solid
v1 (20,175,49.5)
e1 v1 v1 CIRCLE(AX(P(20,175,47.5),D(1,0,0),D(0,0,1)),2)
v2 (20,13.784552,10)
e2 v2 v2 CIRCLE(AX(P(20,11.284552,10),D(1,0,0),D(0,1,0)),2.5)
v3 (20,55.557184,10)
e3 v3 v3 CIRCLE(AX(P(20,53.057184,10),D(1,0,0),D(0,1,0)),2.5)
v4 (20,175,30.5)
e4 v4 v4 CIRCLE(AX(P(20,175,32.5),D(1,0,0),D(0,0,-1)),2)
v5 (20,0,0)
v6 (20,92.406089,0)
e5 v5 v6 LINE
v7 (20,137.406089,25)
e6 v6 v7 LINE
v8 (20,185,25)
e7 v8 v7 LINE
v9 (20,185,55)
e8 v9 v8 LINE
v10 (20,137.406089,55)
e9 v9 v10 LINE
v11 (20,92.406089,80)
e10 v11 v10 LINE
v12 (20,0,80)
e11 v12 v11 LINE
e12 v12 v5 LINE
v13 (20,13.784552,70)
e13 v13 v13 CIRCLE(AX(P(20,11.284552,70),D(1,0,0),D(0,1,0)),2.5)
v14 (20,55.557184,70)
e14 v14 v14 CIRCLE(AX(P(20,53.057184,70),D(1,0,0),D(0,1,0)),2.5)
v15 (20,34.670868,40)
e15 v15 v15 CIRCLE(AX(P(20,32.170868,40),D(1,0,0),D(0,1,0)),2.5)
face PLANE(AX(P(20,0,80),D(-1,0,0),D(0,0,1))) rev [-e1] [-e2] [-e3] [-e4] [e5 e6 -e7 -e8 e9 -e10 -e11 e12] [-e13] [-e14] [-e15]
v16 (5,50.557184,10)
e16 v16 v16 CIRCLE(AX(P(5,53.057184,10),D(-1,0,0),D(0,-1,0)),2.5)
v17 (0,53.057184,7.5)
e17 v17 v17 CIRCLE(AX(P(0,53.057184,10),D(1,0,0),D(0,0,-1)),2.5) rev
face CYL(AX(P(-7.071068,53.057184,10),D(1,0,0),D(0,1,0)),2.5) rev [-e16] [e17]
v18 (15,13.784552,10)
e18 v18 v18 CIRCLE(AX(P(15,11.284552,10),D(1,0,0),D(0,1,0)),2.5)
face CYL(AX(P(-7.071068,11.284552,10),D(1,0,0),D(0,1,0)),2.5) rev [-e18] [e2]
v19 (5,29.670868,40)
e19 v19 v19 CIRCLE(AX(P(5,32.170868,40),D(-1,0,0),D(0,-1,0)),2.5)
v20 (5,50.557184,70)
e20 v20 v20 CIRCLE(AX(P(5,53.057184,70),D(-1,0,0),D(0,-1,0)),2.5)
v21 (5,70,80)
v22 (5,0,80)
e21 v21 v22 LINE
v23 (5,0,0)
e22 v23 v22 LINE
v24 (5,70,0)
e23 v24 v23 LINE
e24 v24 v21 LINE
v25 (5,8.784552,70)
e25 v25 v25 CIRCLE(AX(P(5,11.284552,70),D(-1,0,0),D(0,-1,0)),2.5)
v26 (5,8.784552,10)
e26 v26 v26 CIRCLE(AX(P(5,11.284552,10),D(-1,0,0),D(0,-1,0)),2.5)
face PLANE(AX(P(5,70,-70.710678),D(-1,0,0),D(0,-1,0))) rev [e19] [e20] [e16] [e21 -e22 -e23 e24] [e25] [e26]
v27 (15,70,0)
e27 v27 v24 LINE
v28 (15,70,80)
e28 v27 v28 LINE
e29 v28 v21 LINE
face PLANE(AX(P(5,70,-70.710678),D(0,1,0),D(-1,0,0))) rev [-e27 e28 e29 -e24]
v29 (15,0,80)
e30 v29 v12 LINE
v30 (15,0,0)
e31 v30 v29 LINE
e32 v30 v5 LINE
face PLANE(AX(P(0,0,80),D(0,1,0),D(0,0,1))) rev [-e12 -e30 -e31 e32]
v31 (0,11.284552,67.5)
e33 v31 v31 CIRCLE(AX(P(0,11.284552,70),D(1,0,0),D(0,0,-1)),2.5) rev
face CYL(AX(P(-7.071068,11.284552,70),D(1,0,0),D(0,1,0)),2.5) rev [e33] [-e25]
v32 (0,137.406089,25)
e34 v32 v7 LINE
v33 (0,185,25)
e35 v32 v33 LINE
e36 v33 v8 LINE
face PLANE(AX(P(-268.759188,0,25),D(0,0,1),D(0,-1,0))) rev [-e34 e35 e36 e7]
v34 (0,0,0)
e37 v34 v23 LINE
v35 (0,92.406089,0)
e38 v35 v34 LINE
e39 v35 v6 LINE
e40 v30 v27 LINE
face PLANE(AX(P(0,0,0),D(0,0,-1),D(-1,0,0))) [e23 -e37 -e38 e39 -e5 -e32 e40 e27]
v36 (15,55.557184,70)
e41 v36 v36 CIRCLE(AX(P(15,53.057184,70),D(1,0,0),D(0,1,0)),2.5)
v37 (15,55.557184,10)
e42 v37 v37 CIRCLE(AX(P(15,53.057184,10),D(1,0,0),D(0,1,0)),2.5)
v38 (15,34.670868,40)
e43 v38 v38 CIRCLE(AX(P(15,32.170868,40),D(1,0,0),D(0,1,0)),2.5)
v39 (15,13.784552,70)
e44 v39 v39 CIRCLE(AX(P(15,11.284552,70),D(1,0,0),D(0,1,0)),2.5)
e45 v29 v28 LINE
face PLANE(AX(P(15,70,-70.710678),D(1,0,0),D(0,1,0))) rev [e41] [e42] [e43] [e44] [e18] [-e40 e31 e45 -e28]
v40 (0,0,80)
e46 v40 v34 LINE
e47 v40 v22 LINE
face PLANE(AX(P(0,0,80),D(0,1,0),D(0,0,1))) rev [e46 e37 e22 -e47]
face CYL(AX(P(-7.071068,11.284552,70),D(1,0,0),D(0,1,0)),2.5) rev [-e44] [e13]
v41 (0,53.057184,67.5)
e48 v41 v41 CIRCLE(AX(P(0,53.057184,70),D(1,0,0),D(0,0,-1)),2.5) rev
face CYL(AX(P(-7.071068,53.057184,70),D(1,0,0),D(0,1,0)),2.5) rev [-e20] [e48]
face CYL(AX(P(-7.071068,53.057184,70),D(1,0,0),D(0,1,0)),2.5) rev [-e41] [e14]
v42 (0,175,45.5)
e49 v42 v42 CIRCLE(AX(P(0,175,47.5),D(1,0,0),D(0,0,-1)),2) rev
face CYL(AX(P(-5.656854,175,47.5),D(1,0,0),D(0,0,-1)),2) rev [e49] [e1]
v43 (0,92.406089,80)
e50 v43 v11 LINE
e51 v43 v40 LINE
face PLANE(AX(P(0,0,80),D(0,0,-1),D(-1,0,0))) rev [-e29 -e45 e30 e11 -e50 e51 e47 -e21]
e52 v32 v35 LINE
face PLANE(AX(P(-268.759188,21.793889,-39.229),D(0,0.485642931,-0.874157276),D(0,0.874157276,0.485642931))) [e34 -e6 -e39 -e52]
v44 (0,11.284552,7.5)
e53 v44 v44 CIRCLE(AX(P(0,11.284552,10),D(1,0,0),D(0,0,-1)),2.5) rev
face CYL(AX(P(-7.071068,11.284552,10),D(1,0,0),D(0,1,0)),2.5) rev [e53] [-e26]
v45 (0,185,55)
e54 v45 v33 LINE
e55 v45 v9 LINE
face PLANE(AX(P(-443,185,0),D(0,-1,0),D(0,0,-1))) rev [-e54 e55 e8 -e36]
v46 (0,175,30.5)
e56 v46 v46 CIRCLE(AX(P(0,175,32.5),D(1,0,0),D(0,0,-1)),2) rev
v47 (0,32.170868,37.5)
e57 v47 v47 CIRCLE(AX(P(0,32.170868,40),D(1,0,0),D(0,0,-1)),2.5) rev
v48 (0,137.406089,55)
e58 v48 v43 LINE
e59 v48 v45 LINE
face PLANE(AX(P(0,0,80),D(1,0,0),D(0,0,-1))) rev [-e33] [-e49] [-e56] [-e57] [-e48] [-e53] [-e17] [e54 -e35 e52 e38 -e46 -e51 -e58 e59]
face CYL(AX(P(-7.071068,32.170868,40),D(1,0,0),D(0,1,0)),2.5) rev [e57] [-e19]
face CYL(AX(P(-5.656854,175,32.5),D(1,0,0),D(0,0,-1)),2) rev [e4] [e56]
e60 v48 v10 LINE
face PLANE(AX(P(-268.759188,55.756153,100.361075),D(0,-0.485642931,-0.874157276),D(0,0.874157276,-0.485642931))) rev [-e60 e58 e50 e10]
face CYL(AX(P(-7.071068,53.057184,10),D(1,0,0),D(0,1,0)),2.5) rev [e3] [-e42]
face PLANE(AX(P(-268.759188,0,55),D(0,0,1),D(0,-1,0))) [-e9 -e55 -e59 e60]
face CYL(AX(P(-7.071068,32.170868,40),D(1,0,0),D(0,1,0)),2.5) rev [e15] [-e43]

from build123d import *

# Parameters (mm, degrees)
SUPPORT_BALISE_W                           = 20
SUPPORT_BALISE_H                           = 350
SUPPORT_BALISE_BOSSAGE_DEPTH               = 80
ESQUISSE3_W                                = 80
ESQUISSE3_H                                = 80
SUPPORT_CHEVAL_ENLEVEMENT_DE_MATIERE_DEPTH = 10
ESQUISSE8_W                                = 10
ESQUISSE8_H                                = 70
SUPPORT_CHEVAL_DEPTH                       = 80
VIS_REACH                                  = 376.466
SERRAGE_VIS_R                              = 2.5
VIS_DIRECTION_2_DEPTH                      = 375.466286867
ENL_V_MAT_EXTRU_5_DEPTH                    = 20
POUR_IMPRESSION_R                          = 15
FIXATION_POUR_ASSEMBLAGE_R                 = 2
VIS_POUR_ASSEMBLAGE_DEPTH                  = 20
ESQUISSE13_R                               = 2
ENL_V_MAT_EXTRU_10_DEPTH                   = 463


with BuildPart() as part:
    # Support Balise → Support balise bossage (new body)
    with BuildSketch(Plane.XY):
        with Locations((10, 175)):
            Rectangle(SUPPORT_BALISE_W, SUPPORT_BALISE_H)
    extrude(amount=SUPPORT_BALISE_BOSSAGE_DEPTH)

    # Esquisse3 → Support Cheval enlevement de matiere (add)
    with BuildSketch(Plane(origin=(0, 350, 0), x_dir=(1, 0, 0), z_dir=(0, 1, 0))):
        with Locations((-20, -40)):
            Rectangle(ESQUISSE3_W, ESQUISSE3_H)
    extrude(amount=SUPPORT_CHEVAL_ENLEVEMENT_DE_MATIERE_DEPTH)

    # Esquisse8 → Support Cheval (cut)
    with BuildSketch(Plane.XY.offset(80)):
        with Locations((10, 35)):
            Rectangle(ESQUISSE8_W, ESQUISSE8_H)
    extrude(amount=-SUPPORT_CHEVAL_DEPTH, mode=Mode.SUBTRACT)

    # Vis: up to this face of the body (flat: up to its plane)
    vis_end = Plane(part.part.faces().sort_by_distance((0, 175, 40))[0])
    # Serrage vis → Vis (cut, up to the picked face)
    with BuildSketch(Plane(origin=(5, 0, 0), x_dir=(0, 0, -1), z_dir=(1, 0, 0)), mode=Mode.PRIVATE) as vis_sk1:
        with Locations((-70, 11.284552026)):
            Circle(SERRAGE_VIS_R)
    vis_tool1 = split(extrude(vis_sk1.sketch, amount=-VIS_REACH, mode=Mode.PRIVATE), bisect_by=vis_end, keep=Keep.BOTH, mode=Mode.PRIVATE)
    # Serrage vis → Vis (cut, up to the picked face)
    with BuildSketch(Plane(origin=(5, 0, 0), x_dir=(0, 0, -1), z_dir=(1, 0, 0)), mode=Mode.PRIVATE) as vis_sk2:
        with Locations((-70, 53.057184379)):
            Circle(SERRAGE_VIS_R)
    vis_tool2 = split(extrude(vis_sk2.sketch, amount=-VIS_REACH, mode=Mode.PRIVATE), bisect_by=vis_end, keep=Keep.BOTH, mode=Mode.PRIVATE)
    # Serrage vis → Vis (cut, up to the picked face)
    with BuildSketch(Plane(origin=(5, 0, 0), x_dir=(0, 0, -1), z_dir=(1, 0, 0)), mode=Mode.PRIVATE) as vis_sk3:
        with Locations((-10, 53.057184379)):
            Circle(SERRAGE_VIS_R)
    vis_tool3 = split(extrude(vis_sk3.sketch, amount=-VIS_REACH, mode=Mode.PRIVATE), bisect_by=vis_end, keep=Keep.BOTH, mode=Mode.PRIVATE)
    # Serrage vis → Vis (cut, up to the picked face)
    with BuildSketch(Plane(origin=(5, 0, 0), x_dir=(0, 0, -1), z_dir=(1, 0, 0)), mode=Mode.PRIVATE) as vis_sk4:
        with Locations((-10, 11.284552026)):
            Circle(SERRAGE_VIS_R)
    vis_tool4 = split(extrude(vis_sk4.sketch, amount=-VIS_REACH, mode=Mode.PRIVATE), bisect_by=vis_end, keep=Keep.BOTH, mode=Mode.PRIVATE)
    # Serrage vis → Vis (cut, up to the picked face)
    with BuildSketch(Plane(origin=(5, 0, 0), x_dir=(0, 0, -1), z_dir=(1, 0, 0)), mode=Mode.PRIVATE) as vis_sk5:
        with Locations((-40, 32.170868202)):
            Circle(SERRAGE_VIS_R)
    vis_tool5 = split(extrude(vis_sk5.sketch, amount=-VIS_REACH, mode=Mode.PRIVATE), bisect_by=vis_end, keep=Keep.BOTH, mode=Mode.PRIVATE)
    add(vis_tool1.solids().sort_by(Axis((5, 11.284552, 70), (-1, 0, 0)))[0], mode=Mode.SUBTRACT)
    add(vis_tool2.solids().sort_by(Axis((5, 53.057184, 70), (-1, 0, 0)))[0], mode=Mode.SUBTRACT)
    add(vis_tool3.solids().sort_by(Axis((5, 53.057184, 10), (-1, 0, 0)))[0], mode=Mode.SUBTRACT)
    add(vis_tool4.solids().sort_by(Axis((5, 11.284552, 10), (-1, 0, 0)))[0], mode=Mode.SUBTRACT)
    add(vis_tool5.solids().sort_by(Axis((5, 32.170868, 40), (-1, 0, 0)))[0], mode=Mode.SUBTRACT)

    # Serrage vis → Vis direction 2 (cut)
    with BuildSketch(Plane(origin=(5, 0, 0), x_dir=(0, 0, -1), z_dir=(1, 0, 0))):
        with Locations((-70, 11.284552026)):
            Circle(SERRAGE_VIS_R)
        with Locations((-70, 53.057184379)):
            Circle(SERRAGE_VIS_R)
        with Locations((-10, 53.057184379)):
            Circle(SERRAGE_VIS_R)
        with Locations((-10, 11.284552026)):
            Circle(SERRAGE_VIS_R)
        with Locations((-40, 32.170868202)):
            Circle(SERRAGE_VIS_R)
    extrude(amount=VIS_DIRECTION_2_DEPTH, mode=Mode.SUBTRACT)

    # Design → Enlèv. mat.-Extru.5 (cut)
    with BuildSketch(Plane(origin=(20, 0, 0), x_dir=(0, 0, -1), z_dir=(1, 0, 0))):
        Polygon((-55, 315), (-80, 360), (-80, 92.406088827), (-55, 137.406088827), align=None)
        Polygon((0, 92.406088827), (0, 360), (-25, 315), (-25, 137.406088827), align=None)
    extrude(amount=-ENL_V_MAT_EXTRU_5_DEPTH, mode=Mode.SUBTRACT)

    # Pour Impression
    # the kernel refuses this fillet: 15 mm, written as the material it adds along each edge
    with BuildSketch(Plane(origin=(0, 392.780897855, -18.211609919), x_dir=(1, 0, 0), z_dir=(0, -0.8741572761215375, 0.48564293117863266))) as pour_impression_piece_1_section:
        with BuildLine():
            CenterArc((POUR_IMPRESSION_R, -POUR_IMPRESSION_R), POUR_IMPRESSION_R, 90, 90)
            Line((0, -POUR_IMPRESSION_R), (0, 0))
            Line((0, 0), (POUR_IMPRESSION_R, 0))
        make_face()
    pour_impression_piece_1 = extrude(amount=86.439589046, mode=Mode.PRIVATE)
    pour_impression_piece_1 = split(pour_impression_piece_1, bisect_by=Plane(origin=(4.741525676, 350, 2.029382941), z_dir=(0, 1, 0)), keep=Keep.TOP, mode=Mode.PRIVATE)
    pour_impression_piece_1 = split(pour_impression_piece_1, bisect_by=Plane(origin=(4.741525676, 353.652889294, 0), z_dir=(0, 0, 1)), keep=Keep.TOP, mode=Mode.PRIVATE)
    add(pour_impression_piece_1)
    with BuildSketch(Plane(origin=(0, 317.219102145, 56.232834525), x_dir=(1, 0, 0), z_dir=(0, 0.8741572761215377, 0.4856429311786322))) as pour_impression_piece_2_section:
        with BuildLine():
            CenterArc((POUR_IMPRESSION_R, -POUR_IMPRESSION_R), POUR_IMPRESSION_R, 90, 90)
            Line((0, -POUR_IMPRESSION_R), (0, 0))
            Line((0, 0), (POUR_IMPRESSION_R, 0))
        make_face()
    pour_impression_piece_2 = extrude(amount=86.439589046, mode=Mode.PRIVATE)
    pour_impression_piece_2 = split(pour_impression_piece_2, bisect_by=Plane(origin=(4.741525676, 350, 77.970617059), z_dir=(0, 1, 0)), keep=Keep.TOP, mode=Mode.PRIVATE)
    pour_impression_piece_2 = split(pour_impression_piece_2, bisect_by=Plane(origin=(4.741525676, 353.652889294, 80), z_dir=(0, 0, -1)), keep=Keep.TOP, mode=Mode.PRIVATE)
    add(pour_impression_piece_2)

    # Fixation pour assemblage → Vis pour Assemblage (cut)
    with BuildSketch(Plane(origin=(20, 0, 0), x_dir=(0, 0, -1), z_dir=(1, 0, 0))):
        with Locations((-47.5, 195)):
            Circle(FIXATION_POUR_ASSEMBLAGE_R)
        with Locations((-32.5, 195)):
            Circle(FIXATION_POUR_ASSEMBLAGE_R)
        with Locations((-32.5, 175)):
            Circle(FIXATION_POUR_ASSEMBLAGE_R)
        with Locations((-47.5, 175)):
            Circle(FIXATION_POUR_ASSEMBLAGE_R)
    extrude(amount=-VIS_POUR_ASSEMBLAGE_DEPTH, mode=Mode.SUBTRACT)

    # Esquisse13 → Enlèv. mat.-Extru.10 (cut)
    # profile 1 of 2: a face of its own
    with BuildSketch(Plane(origin=(20, 0, 0), x_dir=(0, 0, -1), z_dir=(1, 0, 0))):
        Polygon((-174.897376457, 185), (-55, 185), (-55, 315), (-80, 360), (0, 360), (-25, 315), (-25, 185), (122.454281653, 185), (122.454281653, 440.420380727), (-174.897376457, 440.420380727), align=None)
    # profile 2 of 2: a face of its own
    with BuildSketch(Plane(origin=(20, 0, 0), x_dir=(0, 0, -1), z_dir=(1, 0, 0))):
        Polygon((-55, 315), (-55, 185), (-25, 185), (-25, 315), (0, 360), (-80, 360), align=None)
        with Locations((-47.5, 195)):
            Circle(ESQUISSE13_R, mode=Mode.SUBTRACT)
        with Locations((-32.5, 195)):
            Circle(ESQUISSE13_R, mode=Mode.SUBTRACT)
    extrude(amount=-ENL_V_MAT_EXTRU_10_DEPTH, mode=Mode.SUBTRACT)


solid = part.part
